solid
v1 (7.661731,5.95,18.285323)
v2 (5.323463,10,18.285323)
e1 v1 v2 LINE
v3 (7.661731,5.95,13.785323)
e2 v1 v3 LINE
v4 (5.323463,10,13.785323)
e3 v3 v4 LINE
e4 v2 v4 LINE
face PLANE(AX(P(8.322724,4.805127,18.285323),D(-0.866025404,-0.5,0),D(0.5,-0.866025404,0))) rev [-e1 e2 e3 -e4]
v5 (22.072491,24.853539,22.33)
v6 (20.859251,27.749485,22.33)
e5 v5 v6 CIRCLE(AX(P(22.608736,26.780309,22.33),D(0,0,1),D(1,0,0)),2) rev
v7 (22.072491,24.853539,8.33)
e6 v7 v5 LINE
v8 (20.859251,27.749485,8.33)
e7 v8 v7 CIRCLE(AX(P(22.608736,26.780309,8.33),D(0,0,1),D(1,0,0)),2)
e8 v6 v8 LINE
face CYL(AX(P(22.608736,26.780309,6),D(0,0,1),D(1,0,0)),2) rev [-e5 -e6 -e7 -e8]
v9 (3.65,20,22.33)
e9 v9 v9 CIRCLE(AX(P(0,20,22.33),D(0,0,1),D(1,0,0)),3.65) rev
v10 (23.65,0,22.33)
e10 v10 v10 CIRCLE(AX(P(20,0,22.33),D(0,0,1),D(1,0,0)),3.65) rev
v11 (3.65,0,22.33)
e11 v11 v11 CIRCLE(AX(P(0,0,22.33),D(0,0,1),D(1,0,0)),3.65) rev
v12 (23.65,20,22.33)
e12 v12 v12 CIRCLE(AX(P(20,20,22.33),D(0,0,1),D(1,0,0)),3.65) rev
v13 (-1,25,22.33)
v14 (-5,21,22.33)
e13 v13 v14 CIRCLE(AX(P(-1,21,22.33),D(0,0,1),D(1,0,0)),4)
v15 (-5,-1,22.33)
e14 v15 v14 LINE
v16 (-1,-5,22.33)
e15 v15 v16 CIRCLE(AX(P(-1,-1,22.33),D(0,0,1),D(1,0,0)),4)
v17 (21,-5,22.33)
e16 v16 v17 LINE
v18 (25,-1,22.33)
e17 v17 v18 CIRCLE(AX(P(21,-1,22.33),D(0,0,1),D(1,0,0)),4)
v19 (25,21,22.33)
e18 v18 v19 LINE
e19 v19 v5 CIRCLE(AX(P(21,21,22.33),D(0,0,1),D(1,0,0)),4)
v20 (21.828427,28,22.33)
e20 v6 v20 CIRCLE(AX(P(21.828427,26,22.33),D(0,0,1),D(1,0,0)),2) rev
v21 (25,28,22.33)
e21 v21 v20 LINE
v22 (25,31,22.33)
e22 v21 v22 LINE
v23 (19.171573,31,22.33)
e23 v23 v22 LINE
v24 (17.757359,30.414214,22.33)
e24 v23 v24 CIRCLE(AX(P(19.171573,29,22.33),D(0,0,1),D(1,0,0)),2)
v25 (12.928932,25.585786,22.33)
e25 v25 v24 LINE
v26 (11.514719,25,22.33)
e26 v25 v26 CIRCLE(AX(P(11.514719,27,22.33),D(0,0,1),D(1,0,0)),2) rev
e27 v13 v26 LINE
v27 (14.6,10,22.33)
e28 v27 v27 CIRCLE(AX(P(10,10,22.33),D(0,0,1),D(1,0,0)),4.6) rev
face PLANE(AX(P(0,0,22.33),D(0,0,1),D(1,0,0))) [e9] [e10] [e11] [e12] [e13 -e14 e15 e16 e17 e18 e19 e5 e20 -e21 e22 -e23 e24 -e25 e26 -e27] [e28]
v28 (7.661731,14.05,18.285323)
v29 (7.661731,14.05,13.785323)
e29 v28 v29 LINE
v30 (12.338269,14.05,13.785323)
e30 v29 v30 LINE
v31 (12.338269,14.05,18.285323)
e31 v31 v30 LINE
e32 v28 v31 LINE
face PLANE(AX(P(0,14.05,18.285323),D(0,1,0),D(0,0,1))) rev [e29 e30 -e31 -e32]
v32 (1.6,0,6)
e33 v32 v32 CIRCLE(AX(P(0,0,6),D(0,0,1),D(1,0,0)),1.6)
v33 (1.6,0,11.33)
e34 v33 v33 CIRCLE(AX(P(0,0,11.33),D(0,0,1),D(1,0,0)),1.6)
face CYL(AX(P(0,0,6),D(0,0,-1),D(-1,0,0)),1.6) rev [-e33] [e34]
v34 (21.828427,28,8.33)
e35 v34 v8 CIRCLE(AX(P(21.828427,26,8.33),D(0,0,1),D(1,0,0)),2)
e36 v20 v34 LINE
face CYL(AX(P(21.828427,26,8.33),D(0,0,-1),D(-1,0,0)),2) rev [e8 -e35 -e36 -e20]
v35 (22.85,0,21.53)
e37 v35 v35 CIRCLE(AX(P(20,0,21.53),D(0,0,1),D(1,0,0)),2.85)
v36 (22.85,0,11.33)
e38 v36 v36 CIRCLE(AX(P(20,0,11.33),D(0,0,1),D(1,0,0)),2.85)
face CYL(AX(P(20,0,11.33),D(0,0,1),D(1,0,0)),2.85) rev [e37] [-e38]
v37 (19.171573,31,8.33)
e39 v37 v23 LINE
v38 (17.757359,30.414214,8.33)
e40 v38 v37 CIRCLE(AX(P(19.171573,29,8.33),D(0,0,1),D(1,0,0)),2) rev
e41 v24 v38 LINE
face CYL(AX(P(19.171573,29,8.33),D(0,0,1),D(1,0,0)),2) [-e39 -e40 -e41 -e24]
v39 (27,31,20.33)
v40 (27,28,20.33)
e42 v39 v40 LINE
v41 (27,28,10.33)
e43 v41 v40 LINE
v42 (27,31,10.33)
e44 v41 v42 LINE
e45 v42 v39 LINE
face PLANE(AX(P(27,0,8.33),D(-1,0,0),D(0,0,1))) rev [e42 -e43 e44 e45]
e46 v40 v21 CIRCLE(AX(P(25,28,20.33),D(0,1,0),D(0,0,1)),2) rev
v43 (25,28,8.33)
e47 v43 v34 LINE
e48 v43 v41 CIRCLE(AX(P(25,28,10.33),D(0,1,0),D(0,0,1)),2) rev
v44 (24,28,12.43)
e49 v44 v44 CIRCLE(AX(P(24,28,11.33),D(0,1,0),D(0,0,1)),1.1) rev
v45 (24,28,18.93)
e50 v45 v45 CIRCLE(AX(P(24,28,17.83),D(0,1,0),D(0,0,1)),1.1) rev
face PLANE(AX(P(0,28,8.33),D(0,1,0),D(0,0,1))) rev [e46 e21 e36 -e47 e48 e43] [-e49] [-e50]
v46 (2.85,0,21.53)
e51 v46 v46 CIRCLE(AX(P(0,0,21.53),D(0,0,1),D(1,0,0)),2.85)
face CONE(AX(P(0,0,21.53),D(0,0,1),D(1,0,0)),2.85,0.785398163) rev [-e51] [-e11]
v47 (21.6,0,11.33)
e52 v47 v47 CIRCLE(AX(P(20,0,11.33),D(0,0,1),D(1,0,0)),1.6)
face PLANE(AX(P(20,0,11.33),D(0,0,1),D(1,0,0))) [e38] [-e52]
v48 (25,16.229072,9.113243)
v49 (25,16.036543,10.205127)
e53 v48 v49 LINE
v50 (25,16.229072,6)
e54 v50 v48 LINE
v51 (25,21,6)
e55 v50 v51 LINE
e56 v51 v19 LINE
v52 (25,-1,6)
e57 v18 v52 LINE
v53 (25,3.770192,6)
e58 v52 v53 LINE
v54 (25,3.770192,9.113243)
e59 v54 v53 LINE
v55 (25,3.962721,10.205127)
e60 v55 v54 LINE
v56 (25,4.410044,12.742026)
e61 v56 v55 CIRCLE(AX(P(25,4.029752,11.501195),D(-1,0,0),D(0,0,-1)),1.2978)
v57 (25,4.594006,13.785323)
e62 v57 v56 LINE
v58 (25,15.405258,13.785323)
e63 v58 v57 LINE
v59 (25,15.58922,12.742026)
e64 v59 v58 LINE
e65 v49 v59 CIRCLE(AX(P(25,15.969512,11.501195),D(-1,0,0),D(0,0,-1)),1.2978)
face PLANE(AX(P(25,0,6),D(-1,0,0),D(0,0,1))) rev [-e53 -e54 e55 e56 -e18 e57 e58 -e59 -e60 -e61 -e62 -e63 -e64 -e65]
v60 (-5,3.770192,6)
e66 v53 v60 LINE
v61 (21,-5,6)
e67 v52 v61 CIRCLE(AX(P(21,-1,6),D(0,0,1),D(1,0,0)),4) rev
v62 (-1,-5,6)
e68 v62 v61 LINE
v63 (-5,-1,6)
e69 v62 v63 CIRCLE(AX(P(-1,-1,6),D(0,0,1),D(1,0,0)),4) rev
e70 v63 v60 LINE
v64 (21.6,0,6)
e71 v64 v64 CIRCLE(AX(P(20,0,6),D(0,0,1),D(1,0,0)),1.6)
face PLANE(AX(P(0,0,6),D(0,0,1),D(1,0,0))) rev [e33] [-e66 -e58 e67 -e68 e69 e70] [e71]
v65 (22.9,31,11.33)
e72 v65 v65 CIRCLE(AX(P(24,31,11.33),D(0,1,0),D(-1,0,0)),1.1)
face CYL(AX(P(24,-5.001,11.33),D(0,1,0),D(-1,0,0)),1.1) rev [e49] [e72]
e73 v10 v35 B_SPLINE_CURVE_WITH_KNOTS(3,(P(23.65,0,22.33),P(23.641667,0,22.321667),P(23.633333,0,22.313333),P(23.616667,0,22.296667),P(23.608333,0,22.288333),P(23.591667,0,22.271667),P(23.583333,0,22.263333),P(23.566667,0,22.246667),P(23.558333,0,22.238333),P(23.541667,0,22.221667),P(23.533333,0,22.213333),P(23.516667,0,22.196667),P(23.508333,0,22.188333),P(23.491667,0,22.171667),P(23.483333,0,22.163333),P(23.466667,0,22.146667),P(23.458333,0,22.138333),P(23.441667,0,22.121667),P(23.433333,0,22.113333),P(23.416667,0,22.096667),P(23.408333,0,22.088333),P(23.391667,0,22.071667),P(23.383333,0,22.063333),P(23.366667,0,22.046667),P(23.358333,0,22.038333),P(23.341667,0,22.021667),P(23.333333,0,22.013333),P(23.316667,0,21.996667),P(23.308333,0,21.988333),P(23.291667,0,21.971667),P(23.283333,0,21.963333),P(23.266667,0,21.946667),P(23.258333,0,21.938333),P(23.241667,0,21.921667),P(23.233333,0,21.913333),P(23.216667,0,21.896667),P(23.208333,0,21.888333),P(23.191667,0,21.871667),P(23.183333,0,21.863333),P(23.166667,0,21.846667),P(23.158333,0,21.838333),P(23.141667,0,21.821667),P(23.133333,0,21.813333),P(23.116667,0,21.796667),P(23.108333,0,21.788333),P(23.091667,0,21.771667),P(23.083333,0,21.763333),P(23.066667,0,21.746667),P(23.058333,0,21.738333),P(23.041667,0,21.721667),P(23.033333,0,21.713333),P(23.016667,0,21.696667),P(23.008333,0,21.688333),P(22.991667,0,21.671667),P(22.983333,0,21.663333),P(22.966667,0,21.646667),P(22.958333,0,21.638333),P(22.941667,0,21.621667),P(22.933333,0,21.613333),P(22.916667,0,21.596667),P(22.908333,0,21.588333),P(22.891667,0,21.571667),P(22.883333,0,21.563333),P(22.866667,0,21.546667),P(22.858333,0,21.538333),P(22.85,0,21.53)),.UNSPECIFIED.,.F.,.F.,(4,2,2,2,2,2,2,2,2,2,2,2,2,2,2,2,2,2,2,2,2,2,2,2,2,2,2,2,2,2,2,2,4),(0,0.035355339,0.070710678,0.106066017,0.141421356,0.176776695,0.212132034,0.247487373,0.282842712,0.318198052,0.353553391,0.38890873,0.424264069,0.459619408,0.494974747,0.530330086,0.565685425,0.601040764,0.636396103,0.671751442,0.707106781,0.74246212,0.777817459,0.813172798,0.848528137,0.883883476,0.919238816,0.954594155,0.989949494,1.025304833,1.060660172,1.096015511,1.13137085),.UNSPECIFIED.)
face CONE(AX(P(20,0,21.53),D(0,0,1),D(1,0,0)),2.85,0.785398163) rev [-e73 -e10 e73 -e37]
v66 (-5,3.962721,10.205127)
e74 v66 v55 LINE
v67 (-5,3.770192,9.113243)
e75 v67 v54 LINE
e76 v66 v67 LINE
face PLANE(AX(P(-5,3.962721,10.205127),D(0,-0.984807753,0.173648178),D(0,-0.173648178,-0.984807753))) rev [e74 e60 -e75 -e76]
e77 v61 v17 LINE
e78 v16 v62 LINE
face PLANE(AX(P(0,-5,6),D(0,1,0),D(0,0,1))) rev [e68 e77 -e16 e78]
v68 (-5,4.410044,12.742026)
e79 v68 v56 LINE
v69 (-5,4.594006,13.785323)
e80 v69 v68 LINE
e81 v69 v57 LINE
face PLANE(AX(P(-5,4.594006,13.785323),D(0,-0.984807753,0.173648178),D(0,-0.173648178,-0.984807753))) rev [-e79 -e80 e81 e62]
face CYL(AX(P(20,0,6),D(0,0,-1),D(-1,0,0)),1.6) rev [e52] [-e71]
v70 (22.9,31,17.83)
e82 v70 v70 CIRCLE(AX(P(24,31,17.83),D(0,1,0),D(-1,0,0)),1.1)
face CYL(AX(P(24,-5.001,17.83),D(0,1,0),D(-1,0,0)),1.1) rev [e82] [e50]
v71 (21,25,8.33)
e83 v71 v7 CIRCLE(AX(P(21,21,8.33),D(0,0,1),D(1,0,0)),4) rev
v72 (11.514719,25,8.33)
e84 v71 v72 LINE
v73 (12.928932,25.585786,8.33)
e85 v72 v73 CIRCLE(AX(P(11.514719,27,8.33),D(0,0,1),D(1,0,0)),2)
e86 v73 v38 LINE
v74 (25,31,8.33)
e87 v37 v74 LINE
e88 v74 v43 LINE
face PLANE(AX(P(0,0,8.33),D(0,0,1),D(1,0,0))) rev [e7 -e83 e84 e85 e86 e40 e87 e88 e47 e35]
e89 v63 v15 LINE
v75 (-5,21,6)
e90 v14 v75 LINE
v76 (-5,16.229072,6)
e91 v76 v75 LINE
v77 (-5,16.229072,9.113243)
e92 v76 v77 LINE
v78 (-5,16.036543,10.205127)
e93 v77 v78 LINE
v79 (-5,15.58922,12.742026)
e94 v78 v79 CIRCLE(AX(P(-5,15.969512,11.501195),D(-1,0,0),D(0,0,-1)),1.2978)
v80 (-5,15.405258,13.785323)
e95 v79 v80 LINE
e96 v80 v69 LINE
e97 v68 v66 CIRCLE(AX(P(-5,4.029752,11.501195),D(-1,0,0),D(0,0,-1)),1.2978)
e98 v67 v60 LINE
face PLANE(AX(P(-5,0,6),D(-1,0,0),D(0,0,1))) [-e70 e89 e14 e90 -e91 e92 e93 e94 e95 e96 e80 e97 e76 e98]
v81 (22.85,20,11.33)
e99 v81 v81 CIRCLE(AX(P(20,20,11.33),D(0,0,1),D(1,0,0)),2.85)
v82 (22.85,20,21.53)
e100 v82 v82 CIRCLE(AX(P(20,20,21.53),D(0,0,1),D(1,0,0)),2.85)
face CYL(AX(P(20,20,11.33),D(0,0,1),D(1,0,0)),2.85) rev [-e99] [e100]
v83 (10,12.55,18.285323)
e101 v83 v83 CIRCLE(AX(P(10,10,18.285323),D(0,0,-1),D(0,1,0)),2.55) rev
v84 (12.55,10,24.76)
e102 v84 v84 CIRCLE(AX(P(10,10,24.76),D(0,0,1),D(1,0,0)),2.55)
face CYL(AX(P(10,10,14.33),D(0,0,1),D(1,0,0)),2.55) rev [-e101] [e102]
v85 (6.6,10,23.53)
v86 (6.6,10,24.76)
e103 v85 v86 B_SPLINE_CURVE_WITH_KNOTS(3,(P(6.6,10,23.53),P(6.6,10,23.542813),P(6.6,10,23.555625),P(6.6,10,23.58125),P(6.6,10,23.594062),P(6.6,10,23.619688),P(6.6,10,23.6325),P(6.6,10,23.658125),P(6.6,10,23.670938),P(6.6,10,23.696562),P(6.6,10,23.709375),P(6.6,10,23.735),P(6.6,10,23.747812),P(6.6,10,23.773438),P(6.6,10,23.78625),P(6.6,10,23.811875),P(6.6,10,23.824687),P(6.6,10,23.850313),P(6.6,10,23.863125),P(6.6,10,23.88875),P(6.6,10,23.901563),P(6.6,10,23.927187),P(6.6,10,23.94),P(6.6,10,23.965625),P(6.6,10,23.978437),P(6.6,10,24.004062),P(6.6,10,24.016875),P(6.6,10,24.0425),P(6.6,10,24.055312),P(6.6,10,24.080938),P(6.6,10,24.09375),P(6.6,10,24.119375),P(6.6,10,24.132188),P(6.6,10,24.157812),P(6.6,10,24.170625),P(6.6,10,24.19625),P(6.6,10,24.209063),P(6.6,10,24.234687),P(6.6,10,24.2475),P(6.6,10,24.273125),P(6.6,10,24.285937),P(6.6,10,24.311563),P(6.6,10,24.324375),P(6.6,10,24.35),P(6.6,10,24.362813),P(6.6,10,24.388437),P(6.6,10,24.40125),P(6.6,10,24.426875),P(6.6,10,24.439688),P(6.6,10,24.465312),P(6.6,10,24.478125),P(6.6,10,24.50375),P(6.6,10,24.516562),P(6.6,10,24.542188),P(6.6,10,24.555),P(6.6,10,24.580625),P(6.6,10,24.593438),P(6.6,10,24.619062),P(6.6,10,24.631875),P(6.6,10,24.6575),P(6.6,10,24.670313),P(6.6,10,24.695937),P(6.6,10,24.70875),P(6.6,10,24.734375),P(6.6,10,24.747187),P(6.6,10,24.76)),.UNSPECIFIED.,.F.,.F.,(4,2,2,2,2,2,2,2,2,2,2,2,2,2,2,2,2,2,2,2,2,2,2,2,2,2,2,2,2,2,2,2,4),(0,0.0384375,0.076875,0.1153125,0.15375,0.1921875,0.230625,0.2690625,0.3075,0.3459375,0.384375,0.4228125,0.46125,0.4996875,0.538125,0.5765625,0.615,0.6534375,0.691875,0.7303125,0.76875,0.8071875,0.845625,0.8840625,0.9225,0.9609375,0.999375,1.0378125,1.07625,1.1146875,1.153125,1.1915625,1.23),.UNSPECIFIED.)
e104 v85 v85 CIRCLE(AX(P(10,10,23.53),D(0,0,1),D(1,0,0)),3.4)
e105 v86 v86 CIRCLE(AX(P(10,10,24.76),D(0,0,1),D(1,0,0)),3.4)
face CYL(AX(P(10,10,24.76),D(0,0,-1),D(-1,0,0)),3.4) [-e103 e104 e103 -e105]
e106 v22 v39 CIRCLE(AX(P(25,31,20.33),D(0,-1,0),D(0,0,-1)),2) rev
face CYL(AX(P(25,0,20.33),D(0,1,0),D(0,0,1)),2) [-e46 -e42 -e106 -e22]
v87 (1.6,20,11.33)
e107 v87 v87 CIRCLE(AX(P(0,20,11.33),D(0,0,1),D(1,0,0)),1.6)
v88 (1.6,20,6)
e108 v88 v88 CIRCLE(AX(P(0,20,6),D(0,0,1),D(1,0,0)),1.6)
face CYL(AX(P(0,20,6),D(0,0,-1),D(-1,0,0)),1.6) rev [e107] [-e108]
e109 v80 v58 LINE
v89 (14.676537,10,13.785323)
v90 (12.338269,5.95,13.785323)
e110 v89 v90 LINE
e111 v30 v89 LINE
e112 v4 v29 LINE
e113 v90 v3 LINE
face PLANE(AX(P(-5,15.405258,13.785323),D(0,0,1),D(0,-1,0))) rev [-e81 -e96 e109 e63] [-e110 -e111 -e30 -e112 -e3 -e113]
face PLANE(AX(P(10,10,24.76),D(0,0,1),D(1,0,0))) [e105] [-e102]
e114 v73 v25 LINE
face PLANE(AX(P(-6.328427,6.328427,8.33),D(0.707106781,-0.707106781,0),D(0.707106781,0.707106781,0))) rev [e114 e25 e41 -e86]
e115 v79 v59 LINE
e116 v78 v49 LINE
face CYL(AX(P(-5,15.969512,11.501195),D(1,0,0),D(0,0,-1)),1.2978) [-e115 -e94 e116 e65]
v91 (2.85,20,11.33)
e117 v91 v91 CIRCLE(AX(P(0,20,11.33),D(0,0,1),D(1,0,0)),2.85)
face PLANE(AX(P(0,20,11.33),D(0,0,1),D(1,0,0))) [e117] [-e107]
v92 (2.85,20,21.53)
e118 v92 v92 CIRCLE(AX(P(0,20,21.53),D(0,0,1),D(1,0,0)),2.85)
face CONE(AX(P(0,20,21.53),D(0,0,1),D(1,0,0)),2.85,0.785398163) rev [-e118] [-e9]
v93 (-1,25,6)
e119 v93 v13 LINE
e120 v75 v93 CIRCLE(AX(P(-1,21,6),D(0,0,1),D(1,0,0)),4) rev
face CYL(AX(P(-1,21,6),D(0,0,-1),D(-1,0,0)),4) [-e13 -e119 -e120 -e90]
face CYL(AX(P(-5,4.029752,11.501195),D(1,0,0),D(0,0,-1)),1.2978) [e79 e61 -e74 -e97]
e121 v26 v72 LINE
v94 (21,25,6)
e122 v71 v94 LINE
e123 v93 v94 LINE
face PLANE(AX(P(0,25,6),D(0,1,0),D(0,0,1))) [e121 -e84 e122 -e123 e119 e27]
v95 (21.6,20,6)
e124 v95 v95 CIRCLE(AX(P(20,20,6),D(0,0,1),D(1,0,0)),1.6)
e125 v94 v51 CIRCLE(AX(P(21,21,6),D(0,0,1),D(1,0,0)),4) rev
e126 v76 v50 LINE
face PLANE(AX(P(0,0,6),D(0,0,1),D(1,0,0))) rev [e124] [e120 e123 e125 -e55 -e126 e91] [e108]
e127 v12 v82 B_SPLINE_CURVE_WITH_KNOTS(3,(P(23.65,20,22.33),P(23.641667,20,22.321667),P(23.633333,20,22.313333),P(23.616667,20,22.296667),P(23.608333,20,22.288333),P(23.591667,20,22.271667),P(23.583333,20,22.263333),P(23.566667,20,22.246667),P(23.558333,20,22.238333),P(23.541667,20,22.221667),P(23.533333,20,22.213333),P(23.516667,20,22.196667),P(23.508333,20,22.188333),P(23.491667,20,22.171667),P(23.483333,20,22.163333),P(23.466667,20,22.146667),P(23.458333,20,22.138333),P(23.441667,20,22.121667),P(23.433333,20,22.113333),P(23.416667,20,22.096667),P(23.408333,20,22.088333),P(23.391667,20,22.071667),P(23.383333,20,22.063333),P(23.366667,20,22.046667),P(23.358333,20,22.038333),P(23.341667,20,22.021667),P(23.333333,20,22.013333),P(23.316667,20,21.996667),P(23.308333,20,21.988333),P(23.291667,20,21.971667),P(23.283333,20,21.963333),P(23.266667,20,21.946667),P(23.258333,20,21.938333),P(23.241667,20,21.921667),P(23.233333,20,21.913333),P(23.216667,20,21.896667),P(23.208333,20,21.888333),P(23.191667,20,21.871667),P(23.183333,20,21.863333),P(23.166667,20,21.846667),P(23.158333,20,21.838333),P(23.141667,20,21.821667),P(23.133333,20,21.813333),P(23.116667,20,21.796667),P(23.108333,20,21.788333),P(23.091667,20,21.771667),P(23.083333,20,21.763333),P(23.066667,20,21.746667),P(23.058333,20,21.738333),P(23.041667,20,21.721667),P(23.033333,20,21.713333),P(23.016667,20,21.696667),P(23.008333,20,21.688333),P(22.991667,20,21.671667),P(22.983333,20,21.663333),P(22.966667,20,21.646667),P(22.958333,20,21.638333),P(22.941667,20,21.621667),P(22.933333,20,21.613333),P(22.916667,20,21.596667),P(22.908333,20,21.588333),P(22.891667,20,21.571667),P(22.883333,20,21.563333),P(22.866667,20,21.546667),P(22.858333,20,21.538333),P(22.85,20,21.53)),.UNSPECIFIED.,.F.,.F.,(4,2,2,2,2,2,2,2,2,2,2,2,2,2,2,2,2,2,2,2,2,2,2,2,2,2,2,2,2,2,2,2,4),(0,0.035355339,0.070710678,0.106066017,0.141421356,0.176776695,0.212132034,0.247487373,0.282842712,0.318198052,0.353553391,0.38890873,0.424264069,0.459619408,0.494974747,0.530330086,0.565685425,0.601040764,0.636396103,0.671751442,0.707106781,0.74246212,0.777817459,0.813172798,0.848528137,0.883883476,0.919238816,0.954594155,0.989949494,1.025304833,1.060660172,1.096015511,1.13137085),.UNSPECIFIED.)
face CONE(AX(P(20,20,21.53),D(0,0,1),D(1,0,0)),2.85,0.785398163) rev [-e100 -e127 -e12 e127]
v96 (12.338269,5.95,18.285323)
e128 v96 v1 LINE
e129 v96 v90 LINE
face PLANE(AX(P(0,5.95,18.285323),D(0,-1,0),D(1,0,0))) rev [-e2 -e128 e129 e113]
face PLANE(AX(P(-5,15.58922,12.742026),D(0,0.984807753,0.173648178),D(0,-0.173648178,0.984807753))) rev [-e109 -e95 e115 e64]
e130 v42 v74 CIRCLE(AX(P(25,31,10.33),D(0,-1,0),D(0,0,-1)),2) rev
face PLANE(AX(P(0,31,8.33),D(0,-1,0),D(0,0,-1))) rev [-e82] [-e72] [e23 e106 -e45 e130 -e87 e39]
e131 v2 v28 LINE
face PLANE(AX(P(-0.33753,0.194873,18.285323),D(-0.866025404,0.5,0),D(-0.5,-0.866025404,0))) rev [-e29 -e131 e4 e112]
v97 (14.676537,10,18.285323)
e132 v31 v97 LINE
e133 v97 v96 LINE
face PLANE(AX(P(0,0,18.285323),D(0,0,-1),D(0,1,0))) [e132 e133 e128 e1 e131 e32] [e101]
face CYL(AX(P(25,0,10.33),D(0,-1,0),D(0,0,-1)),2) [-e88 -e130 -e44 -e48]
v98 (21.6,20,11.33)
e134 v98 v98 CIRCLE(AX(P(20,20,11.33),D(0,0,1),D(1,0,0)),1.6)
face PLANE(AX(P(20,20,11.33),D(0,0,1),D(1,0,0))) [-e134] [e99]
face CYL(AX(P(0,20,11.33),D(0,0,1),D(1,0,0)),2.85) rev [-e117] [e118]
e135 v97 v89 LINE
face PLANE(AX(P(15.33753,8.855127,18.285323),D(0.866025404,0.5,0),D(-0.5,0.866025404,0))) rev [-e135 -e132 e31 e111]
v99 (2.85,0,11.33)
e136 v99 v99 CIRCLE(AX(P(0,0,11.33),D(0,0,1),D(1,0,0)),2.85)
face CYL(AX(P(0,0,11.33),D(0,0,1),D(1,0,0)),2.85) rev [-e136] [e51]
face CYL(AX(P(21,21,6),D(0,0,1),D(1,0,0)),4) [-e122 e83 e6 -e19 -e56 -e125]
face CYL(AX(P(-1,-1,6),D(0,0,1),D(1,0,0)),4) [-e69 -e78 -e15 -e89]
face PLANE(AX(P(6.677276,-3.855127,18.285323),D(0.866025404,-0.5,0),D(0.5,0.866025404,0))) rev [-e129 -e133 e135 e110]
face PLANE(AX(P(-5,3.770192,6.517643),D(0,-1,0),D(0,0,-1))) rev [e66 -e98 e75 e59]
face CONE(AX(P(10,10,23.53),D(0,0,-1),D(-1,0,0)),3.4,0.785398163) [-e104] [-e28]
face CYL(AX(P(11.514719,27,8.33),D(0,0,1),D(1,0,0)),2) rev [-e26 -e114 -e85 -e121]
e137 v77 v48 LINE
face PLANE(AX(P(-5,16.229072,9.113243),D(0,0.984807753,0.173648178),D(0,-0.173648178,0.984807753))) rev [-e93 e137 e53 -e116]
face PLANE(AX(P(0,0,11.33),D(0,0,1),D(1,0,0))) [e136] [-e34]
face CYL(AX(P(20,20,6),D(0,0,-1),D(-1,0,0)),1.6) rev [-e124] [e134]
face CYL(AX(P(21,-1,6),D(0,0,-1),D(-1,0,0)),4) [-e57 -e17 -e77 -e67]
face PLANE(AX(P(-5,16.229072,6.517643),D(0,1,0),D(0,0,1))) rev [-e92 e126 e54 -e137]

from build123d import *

# Parameters (mm, degrees)
SKETCH1_W                  = 30
SKETCH1_H                  = 30
SKETCH1_R                  = 1.6
SKETCH1_W_2                = 81.01
SKETCH1_H_2                = 12
BOSS_EXTRUDE1_DEPTH        = 6
SKETCH1_3_W                = 30
SKETCH1_3_H                = 30
SKETCH1_3_R                = 1.6
BOSS_EXTRUDE2_DEPTH        = 22.33
CUT_EXTRUDE1_DEPTH         = 88.671255266
SKETCH3_R                  = 2.55
CUT_EXTRUDE2_DEPTH         = 8
CUT_EXTRUDE3_DEPTH         = 4.5
SKETCH6_R                  = 5
CUT_EXTRUDE5_DEPTH         = 8.6
SKETCH7_R                  = 1.6
CUT_EXTRUDE6_DEPTH         = 112.183402538
SKETCH8_R                  = 2.85
CUT_EXTRUDE7_DEPTH         = 11
BOSS_EXTRUDE3_START        = 2.43
SKETCH9_R                  = 3.4
SKETCH9_R_2                = 2.55
BOSS_EXTRUDE3_DEPTH        = 2.43
CHAMFER1_SIZE              = 1.2
FILLET3_R                  = 4
CHAMFER2_SIZE              = 0.8
BOSS_EXTRUDE6_DEPTH        = 14
CUT_EXTRUDE10_REACH        = 116.661
SKETCH17_R                 = 1.1
FILLET5_R                  = 2
CUT_EXTRUDE11_DEPTH        = 3
CHAMFER3_SIZE              = 0.8
LPATTERN2_COUNT            = 3
LPATTERN2_PITCH            = 25
CHAMFER3_OF_LPATTERN2_SIZE = 0.8
SKETCH18_W                 = 122.175107863
SKETCH18_H                 = 35.769473483
CUT_EXTRUDE12_DEPTH        = 6


with BuildPart() as part:
    # Sketch1 → Boss-Extrude1 (new body)
    # profile 1 of 2: a face of its own
    with BuildSketch(Plane.XY):
        with Locations((10, 10)):
            Rectangle(SKETCH1_W, SKETCH1_H)
        with Locations((20, 0)):
            Circle(SKETCH1_R, mode=Mode.SUBTRACT)
        with Locations((20, 20)):
            Circle(SKETCH1_R, mode=Mode.SUBTRACT)
        with Locations((0, 20)):
            Circle(SKETCH1_R, mode=Mode.SUBTRACT)
        Circle(SKETCH1_R, mode=Mode.SUBTRACT)
    # profile 2 of 2: a face of its own
    with BuildSketch(Plane.XY):
        with Locations((65.505, 10)):
            Rectangle(SKETCH1_W_2, SKETCH1_H_2)
    extrude(amount=BOSS_EXTRUDE1_DEPTH)

    # Sketch1<3> → Boss-Extrude2 (add)
    with BuildSketch(Plane.XY):
        with Locations((10, 10)):
            Rectangle(SKETCH1_3_W, SKETCH1_3_H)
        with Locations((20, 0)):
            Circle(SKETCH1_3_R, mode=Mode.SUBTRACT)
        with Locations((20, 20)):
            Circle(SKETCH1_3_R, mode=Mode.SUBTRACT)
        with Locations((0, 20)):
            Circle(SKETCH1_3_R, mode=Mode.SUBTRACT)
        Circle(SKETCH1_3_R, mode=Mode.SUBTRACT)
    extrude(amount=BOSS_EXTRUDE2_DEPTH)

    # Sketch2 → Cut-Extrude1 (cut, through all)
    with BuildSketch(Plane(origin=(25, 0, 0), x_dir=(0, 0, -1), z_dir=(1, 0, 0))):
        with BuildLine():
            Line((-6.517643056, 16.229072043), (-9.113243056, 16.229072043))
            Line((-9.113243056, 16.229072043), (-10.205127296, 16.036543391))
            ThreePointArc((-10.205127296, 16.036543391), (-11.275834451, 14.691428541), (-12.742026437, 15.589219625))
            Line((-12.742026437, 15.589219625), (-13.785323056, 15.405258283))
            Line((-13.785323056, 15.405258283), (-13.785323056, 4.594005803))
            Line((-13.785323056, 4.594005803), (-12.742026437, 4.41004446))
            ThreePointArc((-12.742026437, 4.41004446), (-11.275834451, 5.307835545), (-10.205127296, 3.962720694))
            Line((-10.205127296, 3.962720694), (-9.113243056, 3.770192043))
            Line((-9.113243056, 3.770192043), (-6.517643056, 3.770192043))
            Line((-6.517643056, 3.770192043), (-5.963076397, 3.770192043))
            Line((-5.963076397, 3.770192043), (-5.963076397, 16.229072043))
            Line((-5.963076397, 16.229072043), (-6.517643056, 16.229072043))
        make_face()
    extrude(amount=-CUT_EXTRUDE1_DEPTH, mode=Mode.SUBTRACT)

    # Sketch3 → Cut-Extrude2 (cut)
    with BuildSketch(Plane.XY.offset(22.33)):
        with Locations((10, 10)):
            Circle(SKETCH3_R)
    extrude(amount=-CUT_EXTRUDE2_DEPTH, mode=Mode.SUBTRACT)

    # Sketch5 → Cut-Extrude3 (cut)
    with BuildSketch(Plane(origin=(0, 0, 13.785323056), x_dir=(-1, 0, 0), z_dir=(0, 0, -1))):
        Polygon((-5.32346282, 10), (-7.66173141, 14.05), (-12.33826859, 14.05), (-14.67653718, 10), (-12.33826859, 5.95), (-7.66173141, 5.95), align=None)
    extrude(amount=-CUT_EXTRUDE3_DEPTH, mode=Mode.SUBTRACT)

    # Sketch6 → Cut-Extrude5 (cut)
    with BuildSketch(Plane(origin=(0, 0, 0), x_dir=(-1, 0, 0), z_dir=(0, 0, -1))):
        with Locations((-10, 10)):
            Circle(SKETCH6_R)
    extrude(amount=-CUT_EXTRUDE5_DEPTH, mode=Mode.SUBTRACT)

    # Sketch7 → Cut-Extrude6 (cut, through all)
    with BuildSketch(Plane(origin=(0, 0, 0), x_dir=(-1, 0, 0), z_dir=(0, 0, -1))):
        with BuildLine():
            ThreePointArc((-101.1, 10), (-99.5, 8.4), (-97.9, 10))
            Line((-97.9, 10), (-101.1, 10))
        make_face()
        with BuildLine():
            Line((-101.1, 10), (-97.9, 10))
            ThreePointArc((-97.9, 10), (-99.5, 11.6), (-101.1, 10))
        make_face()
        with Locations((-74.5, 10)):
            Circle(SKETCH7_R)
        with Locations((-49.5, 10)):
            Circle(SKETCH7_R)
    extrude(amount=-CUT_EXTRUDE6_DEPTH, mode=Mode.SUBTRACT)

    # Sketch8 → Cut-Extrude7 (cut)
    with BuildSketch(Plane.XY.offset(22.33)):
        with Locations((20, 20)):
            Circle(SKETCH8_R)
        with Locations((20, 0)):
            Circle(SKETCH8_R)
        Circle(SKETCH8_R)
        with Locations((0, 20)):
            Circle(SKETCH8_R)
    extrude(amount=-CUT_EXTRUDE7_DEPTH, mode=Mode.SUBTRACT)

    # Sketch9 → Boss-Extrude3 (add)
    with BuildSketch(Plane.XY.offset(22.33).offset(BOSS_EXTRUDE3_START)):
        with Locations(Location((10, 10, 0), (0, 0, 180))):
            Circle(SKETCH9_R)
        with Locations((10, 10)):
            Circle(SKETCH9_R_2, mode=Mode.SUBTRACT)
    extrude(amount=-BOSS_EXTRUDE3_DEPTH)

    # Chamfer1
    chamfer1_edges = [part.edges().sort_by_distance(p)[0] for p in [
        (13.4, 10, 22.33),
    ]]
    chamfer(chamfer1_edges, length=CHAMFER1_SIZE)

    # Fillet3
    # the kernel refuses this fillet: 4 mm, written as the material it adds along each edge
    with BuildSketch(Plane(origin=(25, 4, 0), x_dir=(0, -1, 0), z_dir=(0, 0, 1))) as fillet3_piece_1:
        with BuildLine():
            CenterArc((FILLET3_R, FILLET3_R), FILLET3_R, 180, 90)
            Line((0, FILLET3_R), (0, 0))
            Line((0, 0), (FILLET3_R, 0))
        make_face()
    extrude(amount=5.963076397)
    with BuildSketch(Plane(origin=(25, 16, 0), x_dir=(0, 1, 0), z_dir=(0, 0, 1))) as fillet3_piece_2:
        with BuildLine():
            CenterArc((FILLET3_R, -FILLET3_R), FILLET3_R, 90, 90)
            Line((0, -FILLET3_R), (0, 0))
            Line((0, 0), (FILLET3_R, 0))
        make_face()
    extrude(amount=5.963076397)
    # the kernel refuses this fillet: 4 mm, written as the material it takes off along each edge
    with BuildSketch(Plane(origin=(-5, -5, 32.33), x_dir=(1, 0, 0), z_dir=(0, 0, -1)), Plane(origin=(-5, 25, 32.33), x_dir=(0, -1, 0), z_dir=(0, 0, -1)), Plane(origin=(25, 25, -10), x_dir=(0, -1, 0), z_dir=(0, 0, 1)), Plane(origin=(25, -5, -10), x_dir=(-1, 0, 0), z_dir=(0, 0, 1))) as fillet3_2_piece_1:
        with BuildLine():
            CenterArc((FILLET3_R, -FILLET3_R), FILLET3_R, 90, 90)
            Line((0, -FILLET3_R), (0, 0))
            Line((0, 0), (FILLET3_R, 0))
        make_face()
    extrude(amount=42.33, mode=Mode.SUBTRACT)
    with BuildSketch(Plane(origin=(106.01, 16, -10), x_dir=(-1, 0, 0), z_dir=(0, 0, 1))) as fillet3_2_piece_2:
        with BuildLine():
            CenterArc((FILLET3_R, FILLET3_R), FILLET3_R, 180, 90)
            Line((0, FILLET3_R), (0, 0))
            Line((0, 0), (FILLET3_R, 0))
        make_face()
    extrude(amount=26, mode=Mode.SUBTRACT)
    with BuildSketch(Plane(origin=(106.01, 4, -10), x_dir=(-1, 0, 0), z_dir=(0, 0, 1))) as fillet3_2_piece_3:
        with BuildLine():
            CenterArc((FILLET3_R, -FILLET3_R), FILLET3_R, 90, 90)
            Line((0, -FILLET3_R), (0, 0))
            Line((0, 0), (FILLET3_R, 0))
        make_face()
    extrude(amount=26, mode=Mode.SUBTRACT)

    # Chamfer2
    chamfer2_edges = [part.edges().sort_by_distance(p)[0] for p in [
        (-2.85, 20, 22.33),
        (-2.85, 0, 22.33),
        (17.15, 0, 22.33),
        (17.15, 20, 22.33),
    ]]
    chamfer(chamfer2_edges, length=CHAMFER2_SIZE)

    # Sketch15 → Boss-Extrude6 (add)
    with BuildSketch(Plane.XY.offset(22.33)):
        Polygon((18.343145751, 31), (12.343145751, 25), (18, 25), (21, 28), (27, 28), (27, 31), align=None)
    extrude(amount=-BOSS_EXTRUDE6_DEPTH)

    # Sketch17 → Cut-Extrude10 (cut, up to next)
    with BuildSketch(Plane(origin=(0, 31, 0), x_dir=(1, 0, 0), z_dir=(0, 1, 0)), mode=Mode.PRIVATE) as cut_extrude10_sk1:
        with Locations(Location((24, -11.33, 0), (0, 0, 180))):
            Circle(SKETCH17_R)
    cut_extrude10_tool1 = extrude(cut_extrude10_sk1.sketch, amount=-CUT_EXTRUDE10_REACH, mode=Mode.PRIVATE) & part.part
    # Sketch17 → Cut-Extrude10 (cut, up to next)
    with BuildSketch(Plane(origin=(0, 31, 0), x_dir=(1, 0, 0), z_dir=(0, 1, 0)), mode=Mode.PRIVATE) as cut_extrude10_sk2:
        with Locations(Location((24, -17.83, 0), (0, 0, 180))):
            Circle(SKETCH17_R)
    cut_extrude10_tool2 = extrude(cut_extrude10_sk2.sketch, amount=-CUT_EXTRUDE10_REACH, mode=Mode.PRIVATE) & part.part
    add(cut_extrude10_tool1.solids().sort_by_distance((24, 31, 11.33))[0], mode=Mode.SUBTRACT)
    add(cut_extrude10_tool2.solids().sort_by_distance((24, 31, 17.83))[0], mode=Mode.SUBTRACT)

    # Fillet5
    # the kernel refuses this fillet: 2 mm, written as the material it adds along each edge
    with BuildSketch(Plane(origin=(21, 28, 22.33), x_dir=(-0.7071067811865475, -0.7071067811865475, 0), z_dir=(0, 0, -1))) as fillet5_piece_1:
        with BuildLine():
            CenterArc((FILLET5_R * 0.414213562373, -FILLET5_R), FILLET5_R, 90, 45)
            Line((-FILLET5_R * 0.292893218813, -FILLET5_R * 0.292893218813), (0, 0))
            Line((0, 0), (FILLET5_R * 0.414213562373, 0))
        make_face()
    extrude(amount=14)
    with BuildSketch(Plane(origin=(12.343145751, 25, 22.33), x_dir=(-1, 0, 0), z_dir=(0, 0, -1))) as fillet5_piece_2:
        with BuildLine():
            CenterArc((FILLET5_R * 0.414213562373, FILLET5_R), FILLET5_R, 225, 45)
            Line((-FILLET5_R * 0.292893218813, FILLET5_R * 0.292893218813), (0, 0))
            Line((0, 0), (FILLET5_R * 0.414213562373, 0))
        make_face()
    extrude(amount=14)
    with BuildSketch(Plane(origin=(18, 25, 22.33), x_dir=(0.9993539414176275, -0.035940225000035846, 0), z_dir=(0, 0, -1))) as fillet5_piece_3:
        with BuildLine():
            CenterArc((4.541773641, -1.944797545), FILLET5_R, 103.492916805, 119.447416414)
            Line((3.07764659, -3.307270289), (2.931233885, -3.443517564))
            Line((2.931233885, -3.443517564), (-0.146412705, -0.136247274))
            Line((-0.146412705, -0.136247274), (0.007188045, 0.199870788))
            ThreePointArc((0.007188045, 0.199870788), (3.005249869, 0.092050113), (4.028458305, 0.194479755))
            Line((4.028458305, 0.194479755), (4.075123335, 0))
        make_face()
    extrude(amount=14)
    # the kernel refuses this fillet: 2 mm, written as the material it takes off along each edge
    with BuildSketch(Plane(origin=(27, 23, 22.33), x_dir=(-1, 0, 0), z_dir=(0, 1, 0))) as fillet5_2_piece_1:
        with BuildLine():
            CenterArc((FILLET5_R, -FILLET5_R), FILLET5_R, 90, 90)
            Line((0, -FILLET5_R), (0, 0))
            Line((0, 0), (FILLET5_R, 0))
        make_face()
    extrude(amount=13, mode=Mode.SUBTRACT)
    with BuildSketch(Plane(origin=(27, 23, 8.33), x_dir=(-1, 0, 0), z_dir=(0, 1, 0))) as fillet5_2_piece_2:
        with BuildLine():
            CenterArc((FILLET5_R, FILLET5_R), FILLET5_R, 180, 90)
            Line((0, FILLET5_R), (0, 0))
            Line((0, 0), (FILLET5_R, 0))
        make_face()
    extrude(amount=13, mode=Mode.SUBTRACT)
    with BuildSketch(Plane(origin=(18.343145751, 31, 24.401067812), x_dir=(-0.7071067811865476, -0.7071067811865476, 0), z_dir=(0, 0, -1))) as fillet5_2_piece_3:
        with BuildLine():
            CenterArc((FILLET5_R * 0.414213562373, -FILLET5_R), FILLET5_R, 90, 45)
            Line((-FILLET5_R * 0.292893218813, -FILLET5_R * 0.292893218813), (0, 0))
            Line((0, 0), (FILLET5_R * 0.414213562373, 0))
        make_face()
    extrude(amount=18.142135624, mode=Mode.SUBTRACT)

    # Sketch10 → Cut-Extrude11 (cut)
    with BuildSketch(Plane(origin=(0, 0, 0), x_dir=(-1, 0, 0), z_dir=(0, 0, -1))):
        Polygon((-97.883419246, 12.8), (-101.116580754, 12.8), (-102.733161507, 10), (-101.116580754, 7.2), (-97.883419246, 7.2), (-96.266838493, 10), align=None)
    cut_extrude11 = extrude(amount=-CUT_EXTRUDE11_DEPTH, mode=Mode.SUBTRACT)

    # Chamfer3
    chamfer3_edges = [part.edges().sort_by_distance(p)[0] for p in [
        (97.075128869, 11.4, 0),
        (99.5, 12.8, 0),
        (101.924871131, 11.4, 0),
        (101.924871131, 8.6, 0),
        (99.5, 7.2, 0),
        (97.075128869, 8.6, 0),
    ]]
    chamfer(chamfer3_edges, length=CHAMFER3_SIZE)

    # LPattern2: Cut-Extrude11 ×3
    with Locations(*[(-i * LPATTERN2_PITCH, 0, 0) for i in range(1, LPATTERN2_COUNT)]):
        add(cut_extrude11, mode=Mode.SUBTRACT)

    # Chamfer3 of LPattern2
    chamfer3_of_lpattern2_edges = [part.edges().sort_by_distance(p)[0] for p in [
        (72.075128869, 11.4, 0),
        (74.5, 12.8, 0),
        (76.924871131, 11.4, 0),
        (76.924871131, 8.6, 0),
        (74.5, 7.2, 0),
        (72.075128869, 8.6, 0),
        (47.075128869, 11.4, 0),
        (49.5, 12.8, 0),
        (51.924871131, 11.4, 0),
        (51.924871131, 8.6, 0),
        (49.5, 7.2, 0),
        (47.075128869, 8.6, 0),
    ]]
    chamfer(chamfer3_of_lpattern2_edges, length=CHAMFER3_OF_LPATTERN2_SIZE)

    # Sketch18 → Cut-Extrude12 (cut)
    with BuildSketch(Plane(origin=(0, 0, 0), x_dir=(-1, 0, 0), z_dir=(0, 0, -1))):
        with Locations((-52.349363477, 8.808264827)):
            Rectangle(SKETCH18_W, SKETCH18_H)
    extrude(amount=-CUT_EXTRUDE12_DEPTH, mode=Mode.SUBTRACT)


solid = part.part
